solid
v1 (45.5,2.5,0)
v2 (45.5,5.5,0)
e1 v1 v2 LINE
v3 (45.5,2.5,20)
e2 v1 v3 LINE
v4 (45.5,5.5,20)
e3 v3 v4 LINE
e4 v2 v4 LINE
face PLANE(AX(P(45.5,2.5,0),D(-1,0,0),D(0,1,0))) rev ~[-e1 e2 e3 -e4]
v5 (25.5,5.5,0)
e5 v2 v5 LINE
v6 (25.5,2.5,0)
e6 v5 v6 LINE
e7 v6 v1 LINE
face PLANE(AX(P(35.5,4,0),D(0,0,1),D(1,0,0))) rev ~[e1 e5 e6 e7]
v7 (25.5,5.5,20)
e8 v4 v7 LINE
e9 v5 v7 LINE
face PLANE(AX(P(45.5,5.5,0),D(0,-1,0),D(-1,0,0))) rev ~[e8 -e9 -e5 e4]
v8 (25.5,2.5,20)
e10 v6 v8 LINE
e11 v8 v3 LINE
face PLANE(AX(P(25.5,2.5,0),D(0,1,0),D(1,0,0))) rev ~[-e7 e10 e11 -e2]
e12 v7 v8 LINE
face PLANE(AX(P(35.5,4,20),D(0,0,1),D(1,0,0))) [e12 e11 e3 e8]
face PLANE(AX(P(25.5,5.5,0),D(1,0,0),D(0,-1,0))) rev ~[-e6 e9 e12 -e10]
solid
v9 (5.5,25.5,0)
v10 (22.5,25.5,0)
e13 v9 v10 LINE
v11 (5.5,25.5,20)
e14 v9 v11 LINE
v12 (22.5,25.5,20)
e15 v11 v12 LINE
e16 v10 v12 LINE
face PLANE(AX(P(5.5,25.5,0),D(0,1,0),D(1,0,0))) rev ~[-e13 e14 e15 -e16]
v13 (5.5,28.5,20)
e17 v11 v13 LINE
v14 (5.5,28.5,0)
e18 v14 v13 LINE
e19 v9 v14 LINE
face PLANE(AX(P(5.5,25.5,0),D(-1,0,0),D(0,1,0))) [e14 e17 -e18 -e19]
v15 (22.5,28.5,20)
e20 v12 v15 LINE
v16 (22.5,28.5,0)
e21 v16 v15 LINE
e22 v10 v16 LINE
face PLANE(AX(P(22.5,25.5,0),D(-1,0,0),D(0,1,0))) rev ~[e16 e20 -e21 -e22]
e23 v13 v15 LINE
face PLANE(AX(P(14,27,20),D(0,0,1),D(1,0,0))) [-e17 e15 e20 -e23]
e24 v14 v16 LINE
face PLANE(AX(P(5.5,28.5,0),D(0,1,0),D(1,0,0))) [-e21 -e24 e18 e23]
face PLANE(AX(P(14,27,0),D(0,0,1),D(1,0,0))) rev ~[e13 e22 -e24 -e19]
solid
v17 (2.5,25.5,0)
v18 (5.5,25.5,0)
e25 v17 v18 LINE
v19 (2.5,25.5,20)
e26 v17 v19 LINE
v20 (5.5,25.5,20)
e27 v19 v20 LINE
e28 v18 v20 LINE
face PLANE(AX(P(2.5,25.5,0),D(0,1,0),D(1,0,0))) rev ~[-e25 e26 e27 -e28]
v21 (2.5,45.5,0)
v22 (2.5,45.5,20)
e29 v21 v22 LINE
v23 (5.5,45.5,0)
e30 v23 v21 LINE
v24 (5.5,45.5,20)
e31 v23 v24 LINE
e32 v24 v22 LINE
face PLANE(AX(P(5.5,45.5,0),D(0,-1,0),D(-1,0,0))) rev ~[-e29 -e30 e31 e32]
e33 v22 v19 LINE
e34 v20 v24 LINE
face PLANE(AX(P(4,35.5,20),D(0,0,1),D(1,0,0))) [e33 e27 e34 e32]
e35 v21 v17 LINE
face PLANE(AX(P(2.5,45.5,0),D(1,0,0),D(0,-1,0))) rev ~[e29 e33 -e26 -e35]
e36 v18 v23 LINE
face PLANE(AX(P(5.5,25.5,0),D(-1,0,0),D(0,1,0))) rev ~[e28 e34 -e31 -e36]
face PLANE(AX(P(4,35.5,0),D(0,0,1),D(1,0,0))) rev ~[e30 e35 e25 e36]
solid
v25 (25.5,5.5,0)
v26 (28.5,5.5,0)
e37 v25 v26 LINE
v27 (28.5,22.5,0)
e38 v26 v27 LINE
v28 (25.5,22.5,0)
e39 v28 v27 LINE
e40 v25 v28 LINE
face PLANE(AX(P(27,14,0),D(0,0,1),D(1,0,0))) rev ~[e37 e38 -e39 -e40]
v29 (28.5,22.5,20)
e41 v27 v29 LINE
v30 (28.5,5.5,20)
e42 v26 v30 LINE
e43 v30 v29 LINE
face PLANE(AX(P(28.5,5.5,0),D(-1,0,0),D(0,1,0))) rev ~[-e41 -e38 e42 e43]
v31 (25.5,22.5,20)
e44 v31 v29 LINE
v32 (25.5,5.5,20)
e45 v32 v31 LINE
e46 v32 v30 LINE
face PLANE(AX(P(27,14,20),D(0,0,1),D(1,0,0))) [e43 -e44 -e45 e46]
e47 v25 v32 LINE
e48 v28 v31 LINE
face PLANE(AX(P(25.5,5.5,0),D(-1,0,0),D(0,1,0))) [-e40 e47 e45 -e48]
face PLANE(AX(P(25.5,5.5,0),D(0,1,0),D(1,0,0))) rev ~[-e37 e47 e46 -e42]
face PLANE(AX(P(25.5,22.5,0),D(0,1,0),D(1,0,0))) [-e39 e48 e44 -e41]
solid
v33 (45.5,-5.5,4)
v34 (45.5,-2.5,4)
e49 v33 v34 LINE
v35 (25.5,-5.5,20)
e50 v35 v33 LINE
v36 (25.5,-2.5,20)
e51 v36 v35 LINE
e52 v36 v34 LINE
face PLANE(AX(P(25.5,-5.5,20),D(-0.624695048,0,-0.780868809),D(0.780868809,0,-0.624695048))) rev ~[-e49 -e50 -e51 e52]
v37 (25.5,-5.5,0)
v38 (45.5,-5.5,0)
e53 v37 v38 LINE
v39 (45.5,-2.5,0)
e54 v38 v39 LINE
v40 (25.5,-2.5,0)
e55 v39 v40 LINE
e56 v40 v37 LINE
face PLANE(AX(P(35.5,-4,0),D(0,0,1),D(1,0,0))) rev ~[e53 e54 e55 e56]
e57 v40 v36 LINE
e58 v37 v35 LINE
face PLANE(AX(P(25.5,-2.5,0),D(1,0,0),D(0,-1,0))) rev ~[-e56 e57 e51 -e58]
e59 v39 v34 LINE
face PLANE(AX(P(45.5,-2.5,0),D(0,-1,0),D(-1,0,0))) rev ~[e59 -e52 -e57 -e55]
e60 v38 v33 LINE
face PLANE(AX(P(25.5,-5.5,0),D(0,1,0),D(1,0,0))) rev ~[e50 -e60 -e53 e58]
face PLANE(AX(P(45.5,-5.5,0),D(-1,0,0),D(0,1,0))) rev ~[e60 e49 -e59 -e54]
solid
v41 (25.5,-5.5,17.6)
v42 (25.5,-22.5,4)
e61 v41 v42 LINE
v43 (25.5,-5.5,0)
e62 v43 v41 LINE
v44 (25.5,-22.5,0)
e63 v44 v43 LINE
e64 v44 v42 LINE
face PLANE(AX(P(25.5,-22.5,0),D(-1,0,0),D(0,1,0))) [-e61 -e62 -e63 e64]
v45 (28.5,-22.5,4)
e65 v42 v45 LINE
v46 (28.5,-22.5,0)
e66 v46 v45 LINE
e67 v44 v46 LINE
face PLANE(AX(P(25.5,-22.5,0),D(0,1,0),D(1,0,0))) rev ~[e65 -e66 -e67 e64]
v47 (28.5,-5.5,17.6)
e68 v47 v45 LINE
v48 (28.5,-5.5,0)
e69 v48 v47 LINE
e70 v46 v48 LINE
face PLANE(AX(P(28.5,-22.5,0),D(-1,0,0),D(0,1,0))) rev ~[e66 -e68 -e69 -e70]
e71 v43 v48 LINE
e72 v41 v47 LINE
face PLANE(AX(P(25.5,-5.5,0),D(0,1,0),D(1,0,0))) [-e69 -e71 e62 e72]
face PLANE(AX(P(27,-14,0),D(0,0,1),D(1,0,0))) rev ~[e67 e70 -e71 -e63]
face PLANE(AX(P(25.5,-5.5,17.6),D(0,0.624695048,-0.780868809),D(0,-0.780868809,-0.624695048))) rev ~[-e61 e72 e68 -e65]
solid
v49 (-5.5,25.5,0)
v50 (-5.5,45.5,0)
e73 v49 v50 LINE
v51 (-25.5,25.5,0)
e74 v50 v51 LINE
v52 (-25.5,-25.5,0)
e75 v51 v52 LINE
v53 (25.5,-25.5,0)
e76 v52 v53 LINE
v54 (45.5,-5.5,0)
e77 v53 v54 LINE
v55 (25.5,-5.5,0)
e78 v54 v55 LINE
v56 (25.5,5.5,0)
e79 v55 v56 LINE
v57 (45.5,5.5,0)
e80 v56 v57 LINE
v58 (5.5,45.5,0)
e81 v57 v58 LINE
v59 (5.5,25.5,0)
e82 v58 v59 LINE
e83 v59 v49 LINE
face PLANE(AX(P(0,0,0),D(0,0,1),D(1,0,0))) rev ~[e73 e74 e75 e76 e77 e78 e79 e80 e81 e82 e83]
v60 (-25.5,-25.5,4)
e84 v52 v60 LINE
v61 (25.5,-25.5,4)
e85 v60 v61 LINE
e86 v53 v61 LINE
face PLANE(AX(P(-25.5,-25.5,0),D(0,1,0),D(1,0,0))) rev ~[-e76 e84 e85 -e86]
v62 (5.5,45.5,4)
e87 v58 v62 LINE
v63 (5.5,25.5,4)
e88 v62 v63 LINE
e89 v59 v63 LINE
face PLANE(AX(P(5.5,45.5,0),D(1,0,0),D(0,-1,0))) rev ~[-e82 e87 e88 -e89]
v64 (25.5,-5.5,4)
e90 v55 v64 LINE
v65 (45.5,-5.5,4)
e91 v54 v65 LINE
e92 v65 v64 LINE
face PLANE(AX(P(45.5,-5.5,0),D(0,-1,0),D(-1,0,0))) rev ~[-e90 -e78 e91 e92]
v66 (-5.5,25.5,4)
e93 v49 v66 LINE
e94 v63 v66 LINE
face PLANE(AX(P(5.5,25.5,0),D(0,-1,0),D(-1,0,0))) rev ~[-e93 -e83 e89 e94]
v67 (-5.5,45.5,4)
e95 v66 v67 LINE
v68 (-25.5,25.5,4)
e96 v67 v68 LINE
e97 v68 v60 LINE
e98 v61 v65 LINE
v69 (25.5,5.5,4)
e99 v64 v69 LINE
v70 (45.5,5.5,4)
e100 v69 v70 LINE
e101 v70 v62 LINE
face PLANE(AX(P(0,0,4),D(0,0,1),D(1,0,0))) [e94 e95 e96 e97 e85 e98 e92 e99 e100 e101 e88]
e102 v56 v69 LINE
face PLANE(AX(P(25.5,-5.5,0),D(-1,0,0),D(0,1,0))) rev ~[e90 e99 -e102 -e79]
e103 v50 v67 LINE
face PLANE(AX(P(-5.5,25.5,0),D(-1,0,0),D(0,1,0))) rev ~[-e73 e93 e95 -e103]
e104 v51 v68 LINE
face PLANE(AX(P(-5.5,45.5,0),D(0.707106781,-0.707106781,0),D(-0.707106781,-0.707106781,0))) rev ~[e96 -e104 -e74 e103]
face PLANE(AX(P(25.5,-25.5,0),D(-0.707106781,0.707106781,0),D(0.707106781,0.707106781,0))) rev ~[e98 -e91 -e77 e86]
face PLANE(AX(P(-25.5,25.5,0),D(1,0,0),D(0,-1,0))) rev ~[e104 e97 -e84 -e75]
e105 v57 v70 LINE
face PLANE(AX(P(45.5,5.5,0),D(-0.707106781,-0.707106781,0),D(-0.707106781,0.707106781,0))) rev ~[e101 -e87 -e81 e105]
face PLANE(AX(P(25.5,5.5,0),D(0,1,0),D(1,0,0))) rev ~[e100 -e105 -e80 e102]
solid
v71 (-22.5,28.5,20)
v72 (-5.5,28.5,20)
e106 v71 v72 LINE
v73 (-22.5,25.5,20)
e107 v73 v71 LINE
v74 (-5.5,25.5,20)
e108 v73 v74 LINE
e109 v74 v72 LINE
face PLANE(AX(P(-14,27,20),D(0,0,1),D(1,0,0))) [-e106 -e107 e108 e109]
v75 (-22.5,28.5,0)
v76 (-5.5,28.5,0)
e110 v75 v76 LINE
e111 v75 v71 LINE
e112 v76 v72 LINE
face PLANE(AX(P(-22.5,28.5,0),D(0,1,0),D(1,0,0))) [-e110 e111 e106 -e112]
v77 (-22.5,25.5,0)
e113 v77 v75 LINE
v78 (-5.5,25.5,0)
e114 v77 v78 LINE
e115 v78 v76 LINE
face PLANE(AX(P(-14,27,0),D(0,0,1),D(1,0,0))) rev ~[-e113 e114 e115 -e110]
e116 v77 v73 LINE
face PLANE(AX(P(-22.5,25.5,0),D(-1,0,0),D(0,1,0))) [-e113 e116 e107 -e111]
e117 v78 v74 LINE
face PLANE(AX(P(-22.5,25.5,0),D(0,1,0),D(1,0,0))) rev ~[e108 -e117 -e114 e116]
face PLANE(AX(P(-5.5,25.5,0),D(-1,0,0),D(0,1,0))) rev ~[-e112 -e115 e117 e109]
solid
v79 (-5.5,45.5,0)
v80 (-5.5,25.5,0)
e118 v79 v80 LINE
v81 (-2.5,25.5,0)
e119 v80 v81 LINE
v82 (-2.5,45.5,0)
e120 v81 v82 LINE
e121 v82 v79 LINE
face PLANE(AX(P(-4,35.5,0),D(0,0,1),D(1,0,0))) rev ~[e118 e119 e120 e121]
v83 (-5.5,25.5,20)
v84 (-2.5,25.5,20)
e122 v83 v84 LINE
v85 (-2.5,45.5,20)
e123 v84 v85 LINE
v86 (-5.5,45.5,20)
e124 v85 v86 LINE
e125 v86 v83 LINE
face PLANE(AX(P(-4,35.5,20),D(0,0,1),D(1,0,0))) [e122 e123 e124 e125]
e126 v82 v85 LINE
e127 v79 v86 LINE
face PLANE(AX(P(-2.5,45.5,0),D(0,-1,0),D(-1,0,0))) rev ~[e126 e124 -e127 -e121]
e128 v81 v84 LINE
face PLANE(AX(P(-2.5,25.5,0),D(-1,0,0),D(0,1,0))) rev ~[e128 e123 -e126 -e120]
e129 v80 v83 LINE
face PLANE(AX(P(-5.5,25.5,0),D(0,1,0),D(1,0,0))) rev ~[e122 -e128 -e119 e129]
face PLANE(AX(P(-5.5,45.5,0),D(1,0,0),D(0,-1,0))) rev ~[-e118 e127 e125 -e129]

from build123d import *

# Parameters (mm, degrees)
F1_DEPTH = 4
F2_W     = 3
F2_H     = 17
F3_DEPTH = 20
F2_W_2   = 17
F2_H_2   = 3
F4_DEPTH = 20
F6_DEPTH = 3
F8_DEPTH = 3


with BuildPart() as f1:
    # F0 (on Top) → F1 (new body)
    with BuildSketch(Plane.XY):
        Polygon((-25.5, -25.5), (25.5, -25.5), (25.5, -5.5), (25.5, 5.5), (25.5, 25.5), (5.5, 25.5), (-5.5, 25.5), (-25.5, 25.5), align=None)
        Polygon((25.5, -5.5), (25.5, -25.5), (45.5, -5.5), align=None)
        Polygon((-5.5, 45.5), (-25.5, 25.5), (-5.5, 25.5), align=None)
        Polygon((25.5, 25.5), (25.5, 5.5), (45.5, 5.5), align=None)
        Polygon((5.5, 25.5), (25.5, 25.5), (5.5, 45.5), align=None)
    extrude(amount=F1_DEPTH)


with BuildPart() as f3:
    # F2 (on Top) → F3 (new body)
    with BuildSketch(Plane.XY):
        with Locations((27, -14)):
            Rectangle(F2_W, F2_H)
    extrude(amount=F3_DEPTH)

    # F5 (on face) → F6 (cut, through all)
    with BuildSketch(Plane(origin=(25.5, 0, 0), x_dir=(0, -1, 0), z_dir=(-1, 0, 0))):
        Polygon((5.5, 20), (5.5, 17.6), (22.5, 4), (22.5, 20), align=None)
    extrude(amount=-F6_DEPTH, mode=Mode.SUBTRACT)


with BuildPart() as f3b:
    # F2 (on Top) → F3, piece 2 (new body)
    with BuildSketch(Plane.XY):
        with Locations((27, 14)):
            Rectangle(F2_W, F2_H)
    extrude(amount=F3_DEPTH)


with BuildPart() as f3c:
    # F2 (on Top) → F3, piece 3 (new body)
    with BuildSketch(Plane.XY):
        with Locations((14, 27)):
            Rectangle(F2_W_2, F2_H_2)
    extrude(amount=F3_DEPTH)


with BuildPart() as f3d:
    # F2 (on Top) → F3, piece 4 (new body)
    with BuildSketch(Plane.XY):
        with Locations((-14, 27)):
            Rectangle(F2_W_2, F2_H_2)
    extrude(amount=F3_DEPTH)


with BuildPart() as f4:
    # F2 (on Top) → F4 (new body)
    with BuildSketch(Plane.XY):
        Polygon((28.5, 5.5), (25.5, 5.5), (25.5, 2.5), (45.5, 2.5), (45.5, 5.5), align=None)
    extrude(amount=F4_DEPTH)


with BuildPart() as f4b:
    # F2 (on Top) → F4, piece 2 (new body)
    with BuildSketch(Plane.XY):
        Polygon((45.5, -2.5), (25.5, -2.5), (25.5, -5.5), (28.5, -5.5), (45.5, -5.5), align=None)
    extrude(amount=F4_DEPTH)

    # F7 (on face) → F8 (cut, through all)
    with BuildSketch(Plane.XZ.offset(5.5)):
        Polygon((45.5, 20), (25.5, 20), (45.5, 4), align=None)
    extrude(amount=-F8_DEPTH, mode=Mode.SUBTRACT)


with BuildPart() as f4c:
    # F2 (on Top) → F4, piece 3 (new body)
    with BuildSketch(Plane.XY):
        Polygon((2.5, 45.5), (2.5, 25.5), (5.5, 25.5), (5.5, 28.5), (5.5, 45.5), align=None)
    extrude(amount=F4_DEPTH)


with BuildPart() as f4d:
    # F2 (on Top) → F4, piece 4 (new body)
    with BuildSketch(Plane.XY):
        Polygon((-5.5, 28.5), (-5.5, 25.5), (-2.5, 25.5), (-2.5, 45.5), (-5.5, 45.5), align=None)
    extrude(amount=F4_DEPTH)


solid = Compound([f1.part, f3.part, f3b.part, f3c.part, f3d.part, f4.part, f4b.part, f4c.part, f4d.part])
